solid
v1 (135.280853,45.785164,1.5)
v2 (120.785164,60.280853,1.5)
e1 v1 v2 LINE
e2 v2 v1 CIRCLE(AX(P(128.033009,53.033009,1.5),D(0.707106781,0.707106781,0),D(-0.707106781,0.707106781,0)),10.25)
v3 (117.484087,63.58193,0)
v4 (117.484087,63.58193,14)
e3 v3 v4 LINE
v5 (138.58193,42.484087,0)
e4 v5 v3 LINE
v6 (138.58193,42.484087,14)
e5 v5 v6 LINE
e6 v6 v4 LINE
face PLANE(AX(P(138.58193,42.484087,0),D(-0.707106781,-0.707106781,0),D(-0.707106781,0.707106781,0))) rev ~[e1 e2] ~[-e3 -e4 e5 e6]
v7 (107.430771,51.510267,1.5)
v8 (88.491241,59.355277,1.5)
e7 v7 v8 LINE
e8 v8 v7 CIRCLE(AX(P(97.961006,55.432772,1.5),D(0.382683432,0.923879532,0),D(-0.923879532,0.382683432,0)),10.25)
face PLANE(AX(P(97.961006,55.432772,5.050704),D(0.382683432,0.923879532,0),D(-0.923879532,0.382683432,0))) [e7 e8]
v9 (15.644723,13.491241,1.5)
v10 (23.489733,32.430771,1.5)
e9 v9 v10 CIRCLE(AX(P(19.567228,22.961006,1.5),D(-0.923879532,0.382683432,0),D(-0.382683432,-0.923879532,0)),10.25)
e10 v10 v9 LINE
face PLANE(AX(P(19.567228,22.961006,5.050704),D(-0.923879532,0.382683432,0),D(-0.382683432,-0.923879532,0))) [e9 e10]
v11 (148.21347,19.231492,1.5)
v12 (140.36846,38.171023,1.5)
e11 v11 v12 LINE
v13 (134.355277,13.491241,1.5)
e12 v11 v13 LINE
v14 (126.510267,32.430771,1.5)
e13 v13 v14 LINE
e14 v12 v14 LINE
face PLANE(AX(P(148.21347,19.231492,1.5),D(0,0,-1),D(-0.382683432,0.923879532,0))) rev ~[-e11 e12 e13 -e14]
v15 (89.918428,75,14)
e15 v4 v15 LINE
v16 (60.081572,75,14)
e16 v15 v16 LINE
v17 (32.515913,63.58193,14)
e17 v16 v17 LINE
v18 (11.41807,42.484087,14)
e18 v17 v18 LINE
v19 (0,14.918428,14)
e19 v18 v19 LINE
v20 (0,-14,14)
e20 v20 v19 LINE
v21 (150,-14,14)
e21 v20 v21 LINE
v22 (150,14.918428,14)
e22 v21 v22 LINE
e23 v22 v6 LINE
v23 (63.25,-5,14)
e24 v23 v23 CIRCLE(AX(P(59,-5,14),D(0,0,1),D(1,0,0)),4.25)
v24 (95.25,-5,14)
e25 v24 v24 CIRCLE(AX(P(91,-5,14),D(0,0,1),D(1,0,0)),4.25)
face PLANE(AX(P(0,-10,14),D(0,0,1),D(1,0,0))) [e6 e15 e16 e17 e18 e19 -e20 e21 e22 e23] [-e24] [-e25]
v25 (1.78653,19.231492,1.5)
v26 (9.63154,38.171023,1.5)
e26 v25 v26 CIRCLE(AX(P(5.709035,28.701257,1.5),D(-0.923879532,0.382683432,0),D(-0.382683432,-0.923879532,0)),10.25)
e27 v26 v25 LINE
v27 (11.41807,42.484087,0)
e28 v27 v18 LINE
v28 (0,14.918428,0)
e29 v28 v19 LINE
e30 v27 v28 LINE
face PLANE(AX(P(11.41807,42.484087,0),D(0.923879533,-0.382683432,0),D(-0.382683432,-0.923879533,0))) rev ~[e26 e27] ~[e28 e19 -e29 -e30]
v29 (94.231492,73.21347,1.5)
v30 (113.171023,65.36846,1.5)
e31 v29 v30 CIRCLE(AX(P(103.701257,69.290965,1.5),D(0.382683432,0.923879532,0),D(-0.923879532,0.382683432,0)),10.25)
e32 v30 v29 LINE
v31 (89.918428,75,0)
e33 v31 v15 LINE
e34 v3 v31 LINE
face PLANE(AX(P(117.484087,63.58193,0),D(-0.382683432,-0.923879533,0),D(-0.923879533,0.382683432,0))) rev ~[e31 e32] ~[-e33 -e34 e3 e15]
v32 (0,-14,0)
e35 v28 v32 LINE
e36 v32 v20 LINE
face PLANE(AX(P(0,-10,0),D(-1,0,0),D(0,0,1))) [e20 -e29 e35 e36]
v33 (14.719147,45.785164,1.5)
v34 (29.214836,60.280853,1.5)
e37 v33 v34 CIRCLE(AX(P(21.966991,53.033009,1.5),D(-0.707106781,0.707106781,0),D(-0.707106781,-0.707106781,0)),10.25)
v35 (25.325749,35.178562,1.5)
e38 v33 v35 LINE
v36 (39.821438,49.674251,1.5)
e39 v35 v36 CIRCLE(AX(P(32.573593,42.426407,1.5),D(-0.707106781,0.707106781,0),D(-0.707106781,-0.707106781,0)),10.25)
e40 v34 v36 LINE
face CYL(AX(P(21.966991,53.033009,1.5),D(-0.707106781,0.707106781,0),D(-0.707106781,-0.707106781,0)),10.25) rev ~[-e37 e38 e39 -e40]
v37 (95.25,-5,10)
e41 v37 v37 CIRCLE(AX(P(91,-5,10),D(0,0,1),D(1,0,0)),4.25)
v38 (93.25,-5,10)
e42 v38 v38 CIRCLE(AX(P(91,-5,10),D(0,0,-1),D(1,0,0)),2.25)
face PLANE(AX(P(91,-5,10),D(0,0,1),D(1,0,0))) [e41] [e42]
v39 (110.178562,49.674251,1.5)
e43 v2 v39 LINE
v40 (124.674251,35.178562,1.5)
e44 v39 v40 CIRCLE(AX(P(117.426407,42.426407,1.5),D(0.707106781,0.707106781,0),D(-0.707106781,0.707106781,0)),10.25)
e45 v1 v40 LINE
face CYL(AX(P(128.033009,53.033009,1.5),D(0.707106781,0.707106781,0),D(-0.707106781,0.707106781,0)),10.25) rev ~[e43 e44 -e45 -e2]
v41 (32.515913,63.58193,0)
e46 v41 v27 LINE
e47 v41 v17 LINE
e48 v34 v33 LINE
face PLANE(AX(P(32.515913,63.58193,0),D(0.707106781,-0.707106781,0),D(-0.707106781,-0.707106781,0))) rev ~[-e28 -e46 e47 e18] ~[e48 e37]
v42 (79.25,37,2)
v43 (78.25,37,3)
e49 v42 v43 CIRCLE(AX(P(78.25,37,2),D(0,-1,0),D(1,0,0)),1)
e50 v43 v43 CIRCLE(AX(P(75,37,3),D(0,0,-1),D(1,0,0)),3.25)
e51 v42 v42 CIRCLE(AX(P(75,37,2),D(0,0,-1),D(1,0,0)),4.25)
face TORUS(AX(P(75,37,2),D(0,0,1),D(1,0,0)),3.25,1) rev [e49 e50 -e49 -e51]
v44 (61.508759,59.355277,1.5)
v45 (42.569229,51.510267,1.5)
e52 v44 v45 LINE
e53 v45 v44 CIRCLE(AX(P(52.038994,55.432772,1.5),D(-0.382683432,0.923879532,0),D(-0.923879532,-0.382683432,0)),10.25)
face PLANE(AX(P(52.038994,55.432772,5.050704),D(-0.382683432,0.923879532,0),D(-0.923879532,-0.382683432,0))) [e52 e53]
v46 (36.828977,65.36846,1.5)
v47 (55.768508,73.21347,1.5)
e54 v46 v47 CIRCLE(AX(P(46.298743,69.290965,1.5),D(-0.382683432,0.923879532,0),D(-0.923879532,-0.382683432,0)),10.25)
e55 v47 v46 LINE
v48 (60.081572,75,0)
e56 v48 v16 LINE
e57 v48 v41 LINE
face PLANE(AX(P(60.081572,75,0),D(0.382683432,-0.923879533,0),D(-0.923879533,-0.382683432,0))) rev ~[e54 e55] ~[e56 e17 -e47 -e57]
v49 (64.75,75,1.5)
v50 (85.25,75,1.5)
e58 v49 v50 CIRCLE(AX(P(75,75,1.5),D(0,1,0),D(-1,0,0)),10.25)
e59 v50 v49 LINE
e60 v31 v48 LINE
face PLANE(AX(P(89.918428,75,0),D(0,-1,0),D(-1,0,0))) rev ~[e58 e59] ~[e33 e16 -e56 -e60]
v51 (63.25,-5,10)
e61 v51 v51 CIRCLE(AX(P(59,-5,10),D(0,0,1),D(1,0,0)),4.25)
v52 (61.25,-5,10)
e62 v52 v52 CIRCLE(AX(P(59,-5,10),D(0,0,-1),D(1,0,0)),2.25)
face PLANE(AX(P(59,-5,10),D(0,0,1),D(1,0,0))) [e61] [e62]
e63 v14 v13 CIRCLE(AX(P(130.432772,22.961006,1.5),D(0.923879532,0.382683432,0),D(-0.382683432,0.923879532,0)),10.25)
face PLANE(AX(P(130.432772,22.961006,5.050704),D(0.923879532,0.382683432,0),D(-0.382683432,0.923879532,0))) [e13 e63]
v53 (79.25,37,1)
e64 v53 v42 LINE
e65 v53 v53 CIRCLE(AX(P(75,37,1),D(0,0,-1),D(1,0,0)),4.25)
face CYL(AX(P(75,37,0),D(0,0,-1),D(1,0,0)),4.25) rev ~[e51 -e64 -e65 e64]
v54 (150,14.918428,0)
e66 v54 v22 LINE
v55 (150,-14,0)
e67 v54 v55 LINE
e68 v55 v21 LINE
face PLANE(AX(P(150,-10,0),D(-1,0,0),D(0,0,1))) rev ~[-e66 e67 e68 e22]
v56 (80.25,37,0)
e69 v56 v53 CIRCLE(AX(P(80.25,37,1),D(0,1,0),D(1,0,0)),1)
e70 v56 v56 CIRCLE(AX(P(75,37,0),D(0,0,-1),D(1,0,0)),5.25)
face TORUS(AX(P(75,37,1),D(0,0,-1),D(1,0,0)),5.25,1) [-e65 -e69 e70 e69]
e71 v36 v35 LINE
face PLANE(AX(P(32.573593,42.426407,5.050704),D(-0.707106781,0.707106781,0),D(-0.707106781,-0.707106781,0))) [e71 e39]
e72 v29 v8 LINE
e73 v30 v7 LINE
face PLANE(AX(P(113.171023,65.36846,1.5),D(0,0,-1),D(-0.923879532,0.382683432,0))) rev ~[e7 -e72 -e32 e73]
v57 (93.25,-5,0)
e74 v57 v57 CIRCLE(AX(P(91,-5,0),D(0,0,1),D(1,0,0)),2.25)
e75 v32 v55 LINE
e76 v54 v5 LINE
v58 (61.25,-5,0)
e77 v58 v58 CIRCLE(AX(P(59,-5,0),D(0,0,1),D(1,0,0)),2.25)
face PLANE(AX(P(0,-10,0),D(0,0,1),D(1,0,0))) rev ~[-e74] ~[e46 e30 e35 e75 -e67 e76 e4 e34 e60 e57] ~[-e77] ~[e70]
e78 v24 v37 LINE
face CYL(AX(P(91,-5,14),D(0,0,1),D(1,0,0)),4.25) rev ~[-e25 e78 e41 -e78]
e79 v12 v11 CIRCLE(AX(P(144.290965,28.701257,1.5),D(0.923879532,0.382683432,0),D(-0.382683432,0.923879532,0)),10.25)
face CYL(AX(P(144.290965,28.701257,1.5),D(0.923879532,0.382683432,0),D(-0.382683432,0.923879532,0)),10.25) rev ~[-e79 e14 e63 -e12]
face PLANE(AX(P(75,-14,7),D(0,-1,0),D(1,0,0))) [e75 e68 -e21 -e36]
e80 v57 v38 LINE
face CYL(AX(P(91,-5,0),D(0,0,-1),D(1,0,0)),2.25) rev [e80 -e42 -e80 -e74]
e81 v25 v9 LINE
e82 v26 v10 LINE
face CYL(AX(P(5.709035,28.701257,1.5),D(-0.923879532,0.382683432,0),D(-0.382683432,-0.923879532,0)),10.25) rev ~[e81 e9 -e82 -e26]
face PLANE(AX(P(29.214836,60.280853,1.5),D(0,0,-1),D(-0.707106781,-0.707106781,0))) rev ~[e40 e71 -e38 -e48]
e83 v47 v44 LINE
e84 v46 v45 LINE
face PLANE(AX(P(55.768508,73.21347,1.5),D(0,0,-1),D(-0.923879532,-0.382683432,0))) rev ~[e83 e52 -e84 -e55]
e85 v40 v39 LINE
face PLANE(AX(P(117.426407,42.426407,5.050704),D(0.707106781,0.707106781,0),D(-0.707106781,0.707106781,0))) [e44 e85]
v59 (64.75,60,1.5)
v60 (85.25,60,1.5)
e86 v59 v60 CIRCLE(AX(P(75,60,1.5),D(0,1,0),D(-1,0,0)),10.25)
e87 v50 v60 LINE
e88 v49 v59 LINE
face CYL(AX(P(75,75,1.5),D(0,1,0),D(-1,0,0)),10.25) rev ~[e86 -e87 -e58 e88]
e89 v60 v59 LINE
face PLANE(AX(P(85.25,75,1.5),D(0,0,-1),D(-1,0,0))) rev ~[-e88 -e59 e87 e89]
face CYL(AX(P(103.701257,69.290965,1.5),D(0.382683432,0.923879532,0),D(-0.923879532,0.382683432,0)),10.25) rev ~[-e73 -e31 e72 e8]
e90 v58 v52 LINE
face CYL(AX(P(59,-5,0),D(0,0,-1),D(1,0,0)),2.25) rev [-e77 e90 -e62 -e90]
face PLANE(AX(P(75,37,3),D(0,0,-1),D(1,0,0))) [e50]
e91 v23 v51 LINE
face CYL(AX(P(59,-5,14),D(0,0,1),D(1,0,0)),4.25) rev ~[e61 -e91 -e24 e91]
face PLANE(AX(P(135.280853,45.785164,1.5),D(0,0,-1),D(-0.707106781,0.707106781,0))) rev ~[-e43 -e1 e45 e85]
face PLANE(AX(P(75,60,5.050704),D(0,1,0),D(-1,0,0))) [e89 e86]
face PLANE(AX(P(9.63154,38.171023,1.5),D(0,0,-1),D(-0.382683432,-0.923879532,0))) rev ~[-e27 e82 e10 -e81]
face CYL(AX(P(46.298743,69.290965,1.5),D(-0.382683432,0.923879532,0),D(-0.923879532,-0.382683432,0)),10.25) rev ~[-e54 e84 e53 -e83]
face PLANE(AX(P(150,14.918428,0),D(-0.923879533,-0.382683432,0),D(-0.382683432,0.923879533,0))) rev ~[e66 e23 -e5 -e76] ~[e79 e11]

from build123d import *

# Parameters (mm, degrees)
F0_W      = 150
F0_H      = 10
F0_R      = 2.25
F1_DEPTH  = 14
F5_DEPTH  = 15
F6_DEPTH  = 15
F7_DEPTH  = 15
F8_R      = 4.25
F9_DEPTH  = 4
F10_W     = 150
F10_H     = 14
F11_DEPTH = 4
F12_R     = 4.25
F13_DEPTH = 3
F14_R     = 1
F17_DEPTH = 15
F18_DEPTH = 15
F21_DEPTH = 15
F22_DEPTH = 15


with BuildPart() as f1:
    # F0 (on Top) → F1 (new body)
    with BuildSketch(Plane.XY):
        Polygon((0, 14.9184275535), (0, 0), (150, 0), (150, 14.9184275535), (138.5819298767, 42.4840873013), (117.4840873013, 63.5819298767), (89.9184275535, 75), (60.0815724465, 75), (32.5159126987, 63.5819298767), (11.4180701233, 42.4840873013), align=None)
        with Locations((75, -5)):
            Rectangle(F0_W, F0_H)
        with Locations((59, -5)):
            Circle(F0_R, mode=Mode.SUBTRACT)
        with Locations((91, -5)):
            Circle(F0_R, mode=Mode.SUBTRACT)
    extrude(amount=F1_DEPTH)

    # F4 (on face) → F5 (cut)
    with BuildSketch(Plane(origin=(90.533008589, 90.533008589, 0), x_dir=(-0.7071067812, 0.7071067812, 0), z_dir=(0.7071067812, 0.7071067812, 0))):
        with BuildLine():
            ThreePointArc((-42.783008589, 1.5), (-53.033008589, 11.75), (-63.283008589, 1.5))
            Line((-63.283008589, 1.5), (-42.783008589, 1.5))
        make_face()
    extrude(amount=-F5_DEPTH, mode=Mode.SUBTRACT)

    # F2 (on face) → F6 (cut)
    with BuildSketch(Plane(origin=(0, 75, 0), x_dir=(-1, 0, 0), z_dir=(0, 1, 0))):
        with BuildLine():
            ThreePointArc((-64.75, 1.5), (-75, 11.75), (-85.25, 1.5))
            Line((-85.25, 1.5), (-64.75, 1.5))
        make_face()
    extrude(amount=-F6_DEPTH, mode=Mode.SUBTRACT)

    # F3 (on face) → F7 (cut)
    with BuildSketch(Plane(origin=(-15.533008589, 15.533008589, 0), x_dir=(-0.7071067812, -0.7071067812, 0), z_dir=(-0.7071067812, 0.7071067812, 0))):
        with BuildLine():
            ThreePointArc((-42.783008589, 1.5), (-53.033008589, 11.75), (-63.283008589, 1.5))
            Line((-63.283008589, 1.5), (-42.783008589, 1.5))
        make_face()
    extrude(amount=-F7_DEPTH, mode=Mode.SUBTRACT)

    # F8 (on face) → F9 (cut)
    with BuildSketch(Plane.XY.offset(14)):
        with Locations((59, -5)):
            Circle(F8_R)
        with Locations((91, -5)):
            Circle(F8_R)
    extrude(amount=-F9_DEPTH, mode=Mode.SUBTRACT)

    # F10 (on face) → F11 (join)
    with BuildSketch(Plane.XZ.offset(10)):
        with Locations((75, 7)):
            Rectangle(F10_W, F10_H)
    extrude(amount=F11_DEPTH)

    # F12 (on face) → F13 (cut)
    with BuildSketch(Plane(origin=(0, 0, 0), x_dir=(1, 0, 0), z_dir=(0, 0, -1))):
        with Locations((75, -37)):
            Circle(F12_R)
    extrude(amount=-F13_DEPTH, mode=Mode.SUBTRACT)

    # F14
    f14_edges = [f1.edges().sort_by_distance(p)[0] for p in [
        (70.75, 37, 0),
        (70.75, 37, 3),
    ]]
    fillet(f14_edges, radius=F14_R)

    # F16 (on face) → F17 (cut)
    with BuildSketch(Plane(origin=(133.3074692328, 55.2177617219, 0), x_dir=(-0.3826834324, 0.9238795325, 0), z_dir=(0.9238795325, 0.3826834324, 0))):
        with BuildLine():
            ThreePointArc((-18.4512574274, 1.5), (-28.7012574274, 11.75), (-38.9512574274, 1.5))
            Line((-38.9512574274, 1.5), (-18.4512574274, 1.5))
        make_face()
    extrude(amount=-F17_DEPTH, mode=Mode.SUBTRACT)

    # F15 (on face) → F18 (cut)
    with BuildSketch(Plane(origin=(-5.2744606439, 2.1847531329, 0), x_dir=(-0.3826834324, -0.9238795325, 0), z_dir=(-0.9238795325, 0.3826834324, 0))):
        with BuildLine():
            ThreePointArc((-18.4512574274, 1.5), (-28.7012574274, 11.75), (-38.9512574274, 1.5))
            Line((-38.9512574274, 1.5), (-18.4512574274, 1.5))
        make_face()
    extrude(amount=-F18_DEPTH, mode=Mode.SUBTRACT)

    # F20 (on face) → F21 (cut)
    with BuildSketch(Plane(origin=(-17.7177617219, 42.7744606439, 0), x_dir=(-0.9238795325, -0.3826834324, 0), z_dir=(-0.3826834324, 0.9238795325, 0))):
        with BuildLine():
            ThreePointArc((-59.0409649383, 1.5), (-69.2909649383, 11.75), (-79.5409649383, 1.5))
            Line((-79.5409649383, 1.5), (-59.0409649383, 1.5))
        make_face()
    extrude(amount=-F21_DEPTH, mode=Mode.SUBTRACT)

    # F19 (on face) → F22 (cut)
    with BuildSketch(Plane(origin=(39.6847531329, 95.8074692328, 0), x_dir=(-0.9238795325, 0.3826834324, 0), z_dir=(0.3826834324, 0.9238795325, 0))):
        with BuildLine():
            ThreePointArc((-59.0409649383, 1.5), (-69.2909649383, 11.75), (-79.5409649383, 1.5))
            Line((-79.5409649383, 1.5), (-59.0409649383, 1.5))
        make_face()
    extrude(amount=-F22_DEPTH, mode=Mode.SUBTRACT)


solid = f1.part
